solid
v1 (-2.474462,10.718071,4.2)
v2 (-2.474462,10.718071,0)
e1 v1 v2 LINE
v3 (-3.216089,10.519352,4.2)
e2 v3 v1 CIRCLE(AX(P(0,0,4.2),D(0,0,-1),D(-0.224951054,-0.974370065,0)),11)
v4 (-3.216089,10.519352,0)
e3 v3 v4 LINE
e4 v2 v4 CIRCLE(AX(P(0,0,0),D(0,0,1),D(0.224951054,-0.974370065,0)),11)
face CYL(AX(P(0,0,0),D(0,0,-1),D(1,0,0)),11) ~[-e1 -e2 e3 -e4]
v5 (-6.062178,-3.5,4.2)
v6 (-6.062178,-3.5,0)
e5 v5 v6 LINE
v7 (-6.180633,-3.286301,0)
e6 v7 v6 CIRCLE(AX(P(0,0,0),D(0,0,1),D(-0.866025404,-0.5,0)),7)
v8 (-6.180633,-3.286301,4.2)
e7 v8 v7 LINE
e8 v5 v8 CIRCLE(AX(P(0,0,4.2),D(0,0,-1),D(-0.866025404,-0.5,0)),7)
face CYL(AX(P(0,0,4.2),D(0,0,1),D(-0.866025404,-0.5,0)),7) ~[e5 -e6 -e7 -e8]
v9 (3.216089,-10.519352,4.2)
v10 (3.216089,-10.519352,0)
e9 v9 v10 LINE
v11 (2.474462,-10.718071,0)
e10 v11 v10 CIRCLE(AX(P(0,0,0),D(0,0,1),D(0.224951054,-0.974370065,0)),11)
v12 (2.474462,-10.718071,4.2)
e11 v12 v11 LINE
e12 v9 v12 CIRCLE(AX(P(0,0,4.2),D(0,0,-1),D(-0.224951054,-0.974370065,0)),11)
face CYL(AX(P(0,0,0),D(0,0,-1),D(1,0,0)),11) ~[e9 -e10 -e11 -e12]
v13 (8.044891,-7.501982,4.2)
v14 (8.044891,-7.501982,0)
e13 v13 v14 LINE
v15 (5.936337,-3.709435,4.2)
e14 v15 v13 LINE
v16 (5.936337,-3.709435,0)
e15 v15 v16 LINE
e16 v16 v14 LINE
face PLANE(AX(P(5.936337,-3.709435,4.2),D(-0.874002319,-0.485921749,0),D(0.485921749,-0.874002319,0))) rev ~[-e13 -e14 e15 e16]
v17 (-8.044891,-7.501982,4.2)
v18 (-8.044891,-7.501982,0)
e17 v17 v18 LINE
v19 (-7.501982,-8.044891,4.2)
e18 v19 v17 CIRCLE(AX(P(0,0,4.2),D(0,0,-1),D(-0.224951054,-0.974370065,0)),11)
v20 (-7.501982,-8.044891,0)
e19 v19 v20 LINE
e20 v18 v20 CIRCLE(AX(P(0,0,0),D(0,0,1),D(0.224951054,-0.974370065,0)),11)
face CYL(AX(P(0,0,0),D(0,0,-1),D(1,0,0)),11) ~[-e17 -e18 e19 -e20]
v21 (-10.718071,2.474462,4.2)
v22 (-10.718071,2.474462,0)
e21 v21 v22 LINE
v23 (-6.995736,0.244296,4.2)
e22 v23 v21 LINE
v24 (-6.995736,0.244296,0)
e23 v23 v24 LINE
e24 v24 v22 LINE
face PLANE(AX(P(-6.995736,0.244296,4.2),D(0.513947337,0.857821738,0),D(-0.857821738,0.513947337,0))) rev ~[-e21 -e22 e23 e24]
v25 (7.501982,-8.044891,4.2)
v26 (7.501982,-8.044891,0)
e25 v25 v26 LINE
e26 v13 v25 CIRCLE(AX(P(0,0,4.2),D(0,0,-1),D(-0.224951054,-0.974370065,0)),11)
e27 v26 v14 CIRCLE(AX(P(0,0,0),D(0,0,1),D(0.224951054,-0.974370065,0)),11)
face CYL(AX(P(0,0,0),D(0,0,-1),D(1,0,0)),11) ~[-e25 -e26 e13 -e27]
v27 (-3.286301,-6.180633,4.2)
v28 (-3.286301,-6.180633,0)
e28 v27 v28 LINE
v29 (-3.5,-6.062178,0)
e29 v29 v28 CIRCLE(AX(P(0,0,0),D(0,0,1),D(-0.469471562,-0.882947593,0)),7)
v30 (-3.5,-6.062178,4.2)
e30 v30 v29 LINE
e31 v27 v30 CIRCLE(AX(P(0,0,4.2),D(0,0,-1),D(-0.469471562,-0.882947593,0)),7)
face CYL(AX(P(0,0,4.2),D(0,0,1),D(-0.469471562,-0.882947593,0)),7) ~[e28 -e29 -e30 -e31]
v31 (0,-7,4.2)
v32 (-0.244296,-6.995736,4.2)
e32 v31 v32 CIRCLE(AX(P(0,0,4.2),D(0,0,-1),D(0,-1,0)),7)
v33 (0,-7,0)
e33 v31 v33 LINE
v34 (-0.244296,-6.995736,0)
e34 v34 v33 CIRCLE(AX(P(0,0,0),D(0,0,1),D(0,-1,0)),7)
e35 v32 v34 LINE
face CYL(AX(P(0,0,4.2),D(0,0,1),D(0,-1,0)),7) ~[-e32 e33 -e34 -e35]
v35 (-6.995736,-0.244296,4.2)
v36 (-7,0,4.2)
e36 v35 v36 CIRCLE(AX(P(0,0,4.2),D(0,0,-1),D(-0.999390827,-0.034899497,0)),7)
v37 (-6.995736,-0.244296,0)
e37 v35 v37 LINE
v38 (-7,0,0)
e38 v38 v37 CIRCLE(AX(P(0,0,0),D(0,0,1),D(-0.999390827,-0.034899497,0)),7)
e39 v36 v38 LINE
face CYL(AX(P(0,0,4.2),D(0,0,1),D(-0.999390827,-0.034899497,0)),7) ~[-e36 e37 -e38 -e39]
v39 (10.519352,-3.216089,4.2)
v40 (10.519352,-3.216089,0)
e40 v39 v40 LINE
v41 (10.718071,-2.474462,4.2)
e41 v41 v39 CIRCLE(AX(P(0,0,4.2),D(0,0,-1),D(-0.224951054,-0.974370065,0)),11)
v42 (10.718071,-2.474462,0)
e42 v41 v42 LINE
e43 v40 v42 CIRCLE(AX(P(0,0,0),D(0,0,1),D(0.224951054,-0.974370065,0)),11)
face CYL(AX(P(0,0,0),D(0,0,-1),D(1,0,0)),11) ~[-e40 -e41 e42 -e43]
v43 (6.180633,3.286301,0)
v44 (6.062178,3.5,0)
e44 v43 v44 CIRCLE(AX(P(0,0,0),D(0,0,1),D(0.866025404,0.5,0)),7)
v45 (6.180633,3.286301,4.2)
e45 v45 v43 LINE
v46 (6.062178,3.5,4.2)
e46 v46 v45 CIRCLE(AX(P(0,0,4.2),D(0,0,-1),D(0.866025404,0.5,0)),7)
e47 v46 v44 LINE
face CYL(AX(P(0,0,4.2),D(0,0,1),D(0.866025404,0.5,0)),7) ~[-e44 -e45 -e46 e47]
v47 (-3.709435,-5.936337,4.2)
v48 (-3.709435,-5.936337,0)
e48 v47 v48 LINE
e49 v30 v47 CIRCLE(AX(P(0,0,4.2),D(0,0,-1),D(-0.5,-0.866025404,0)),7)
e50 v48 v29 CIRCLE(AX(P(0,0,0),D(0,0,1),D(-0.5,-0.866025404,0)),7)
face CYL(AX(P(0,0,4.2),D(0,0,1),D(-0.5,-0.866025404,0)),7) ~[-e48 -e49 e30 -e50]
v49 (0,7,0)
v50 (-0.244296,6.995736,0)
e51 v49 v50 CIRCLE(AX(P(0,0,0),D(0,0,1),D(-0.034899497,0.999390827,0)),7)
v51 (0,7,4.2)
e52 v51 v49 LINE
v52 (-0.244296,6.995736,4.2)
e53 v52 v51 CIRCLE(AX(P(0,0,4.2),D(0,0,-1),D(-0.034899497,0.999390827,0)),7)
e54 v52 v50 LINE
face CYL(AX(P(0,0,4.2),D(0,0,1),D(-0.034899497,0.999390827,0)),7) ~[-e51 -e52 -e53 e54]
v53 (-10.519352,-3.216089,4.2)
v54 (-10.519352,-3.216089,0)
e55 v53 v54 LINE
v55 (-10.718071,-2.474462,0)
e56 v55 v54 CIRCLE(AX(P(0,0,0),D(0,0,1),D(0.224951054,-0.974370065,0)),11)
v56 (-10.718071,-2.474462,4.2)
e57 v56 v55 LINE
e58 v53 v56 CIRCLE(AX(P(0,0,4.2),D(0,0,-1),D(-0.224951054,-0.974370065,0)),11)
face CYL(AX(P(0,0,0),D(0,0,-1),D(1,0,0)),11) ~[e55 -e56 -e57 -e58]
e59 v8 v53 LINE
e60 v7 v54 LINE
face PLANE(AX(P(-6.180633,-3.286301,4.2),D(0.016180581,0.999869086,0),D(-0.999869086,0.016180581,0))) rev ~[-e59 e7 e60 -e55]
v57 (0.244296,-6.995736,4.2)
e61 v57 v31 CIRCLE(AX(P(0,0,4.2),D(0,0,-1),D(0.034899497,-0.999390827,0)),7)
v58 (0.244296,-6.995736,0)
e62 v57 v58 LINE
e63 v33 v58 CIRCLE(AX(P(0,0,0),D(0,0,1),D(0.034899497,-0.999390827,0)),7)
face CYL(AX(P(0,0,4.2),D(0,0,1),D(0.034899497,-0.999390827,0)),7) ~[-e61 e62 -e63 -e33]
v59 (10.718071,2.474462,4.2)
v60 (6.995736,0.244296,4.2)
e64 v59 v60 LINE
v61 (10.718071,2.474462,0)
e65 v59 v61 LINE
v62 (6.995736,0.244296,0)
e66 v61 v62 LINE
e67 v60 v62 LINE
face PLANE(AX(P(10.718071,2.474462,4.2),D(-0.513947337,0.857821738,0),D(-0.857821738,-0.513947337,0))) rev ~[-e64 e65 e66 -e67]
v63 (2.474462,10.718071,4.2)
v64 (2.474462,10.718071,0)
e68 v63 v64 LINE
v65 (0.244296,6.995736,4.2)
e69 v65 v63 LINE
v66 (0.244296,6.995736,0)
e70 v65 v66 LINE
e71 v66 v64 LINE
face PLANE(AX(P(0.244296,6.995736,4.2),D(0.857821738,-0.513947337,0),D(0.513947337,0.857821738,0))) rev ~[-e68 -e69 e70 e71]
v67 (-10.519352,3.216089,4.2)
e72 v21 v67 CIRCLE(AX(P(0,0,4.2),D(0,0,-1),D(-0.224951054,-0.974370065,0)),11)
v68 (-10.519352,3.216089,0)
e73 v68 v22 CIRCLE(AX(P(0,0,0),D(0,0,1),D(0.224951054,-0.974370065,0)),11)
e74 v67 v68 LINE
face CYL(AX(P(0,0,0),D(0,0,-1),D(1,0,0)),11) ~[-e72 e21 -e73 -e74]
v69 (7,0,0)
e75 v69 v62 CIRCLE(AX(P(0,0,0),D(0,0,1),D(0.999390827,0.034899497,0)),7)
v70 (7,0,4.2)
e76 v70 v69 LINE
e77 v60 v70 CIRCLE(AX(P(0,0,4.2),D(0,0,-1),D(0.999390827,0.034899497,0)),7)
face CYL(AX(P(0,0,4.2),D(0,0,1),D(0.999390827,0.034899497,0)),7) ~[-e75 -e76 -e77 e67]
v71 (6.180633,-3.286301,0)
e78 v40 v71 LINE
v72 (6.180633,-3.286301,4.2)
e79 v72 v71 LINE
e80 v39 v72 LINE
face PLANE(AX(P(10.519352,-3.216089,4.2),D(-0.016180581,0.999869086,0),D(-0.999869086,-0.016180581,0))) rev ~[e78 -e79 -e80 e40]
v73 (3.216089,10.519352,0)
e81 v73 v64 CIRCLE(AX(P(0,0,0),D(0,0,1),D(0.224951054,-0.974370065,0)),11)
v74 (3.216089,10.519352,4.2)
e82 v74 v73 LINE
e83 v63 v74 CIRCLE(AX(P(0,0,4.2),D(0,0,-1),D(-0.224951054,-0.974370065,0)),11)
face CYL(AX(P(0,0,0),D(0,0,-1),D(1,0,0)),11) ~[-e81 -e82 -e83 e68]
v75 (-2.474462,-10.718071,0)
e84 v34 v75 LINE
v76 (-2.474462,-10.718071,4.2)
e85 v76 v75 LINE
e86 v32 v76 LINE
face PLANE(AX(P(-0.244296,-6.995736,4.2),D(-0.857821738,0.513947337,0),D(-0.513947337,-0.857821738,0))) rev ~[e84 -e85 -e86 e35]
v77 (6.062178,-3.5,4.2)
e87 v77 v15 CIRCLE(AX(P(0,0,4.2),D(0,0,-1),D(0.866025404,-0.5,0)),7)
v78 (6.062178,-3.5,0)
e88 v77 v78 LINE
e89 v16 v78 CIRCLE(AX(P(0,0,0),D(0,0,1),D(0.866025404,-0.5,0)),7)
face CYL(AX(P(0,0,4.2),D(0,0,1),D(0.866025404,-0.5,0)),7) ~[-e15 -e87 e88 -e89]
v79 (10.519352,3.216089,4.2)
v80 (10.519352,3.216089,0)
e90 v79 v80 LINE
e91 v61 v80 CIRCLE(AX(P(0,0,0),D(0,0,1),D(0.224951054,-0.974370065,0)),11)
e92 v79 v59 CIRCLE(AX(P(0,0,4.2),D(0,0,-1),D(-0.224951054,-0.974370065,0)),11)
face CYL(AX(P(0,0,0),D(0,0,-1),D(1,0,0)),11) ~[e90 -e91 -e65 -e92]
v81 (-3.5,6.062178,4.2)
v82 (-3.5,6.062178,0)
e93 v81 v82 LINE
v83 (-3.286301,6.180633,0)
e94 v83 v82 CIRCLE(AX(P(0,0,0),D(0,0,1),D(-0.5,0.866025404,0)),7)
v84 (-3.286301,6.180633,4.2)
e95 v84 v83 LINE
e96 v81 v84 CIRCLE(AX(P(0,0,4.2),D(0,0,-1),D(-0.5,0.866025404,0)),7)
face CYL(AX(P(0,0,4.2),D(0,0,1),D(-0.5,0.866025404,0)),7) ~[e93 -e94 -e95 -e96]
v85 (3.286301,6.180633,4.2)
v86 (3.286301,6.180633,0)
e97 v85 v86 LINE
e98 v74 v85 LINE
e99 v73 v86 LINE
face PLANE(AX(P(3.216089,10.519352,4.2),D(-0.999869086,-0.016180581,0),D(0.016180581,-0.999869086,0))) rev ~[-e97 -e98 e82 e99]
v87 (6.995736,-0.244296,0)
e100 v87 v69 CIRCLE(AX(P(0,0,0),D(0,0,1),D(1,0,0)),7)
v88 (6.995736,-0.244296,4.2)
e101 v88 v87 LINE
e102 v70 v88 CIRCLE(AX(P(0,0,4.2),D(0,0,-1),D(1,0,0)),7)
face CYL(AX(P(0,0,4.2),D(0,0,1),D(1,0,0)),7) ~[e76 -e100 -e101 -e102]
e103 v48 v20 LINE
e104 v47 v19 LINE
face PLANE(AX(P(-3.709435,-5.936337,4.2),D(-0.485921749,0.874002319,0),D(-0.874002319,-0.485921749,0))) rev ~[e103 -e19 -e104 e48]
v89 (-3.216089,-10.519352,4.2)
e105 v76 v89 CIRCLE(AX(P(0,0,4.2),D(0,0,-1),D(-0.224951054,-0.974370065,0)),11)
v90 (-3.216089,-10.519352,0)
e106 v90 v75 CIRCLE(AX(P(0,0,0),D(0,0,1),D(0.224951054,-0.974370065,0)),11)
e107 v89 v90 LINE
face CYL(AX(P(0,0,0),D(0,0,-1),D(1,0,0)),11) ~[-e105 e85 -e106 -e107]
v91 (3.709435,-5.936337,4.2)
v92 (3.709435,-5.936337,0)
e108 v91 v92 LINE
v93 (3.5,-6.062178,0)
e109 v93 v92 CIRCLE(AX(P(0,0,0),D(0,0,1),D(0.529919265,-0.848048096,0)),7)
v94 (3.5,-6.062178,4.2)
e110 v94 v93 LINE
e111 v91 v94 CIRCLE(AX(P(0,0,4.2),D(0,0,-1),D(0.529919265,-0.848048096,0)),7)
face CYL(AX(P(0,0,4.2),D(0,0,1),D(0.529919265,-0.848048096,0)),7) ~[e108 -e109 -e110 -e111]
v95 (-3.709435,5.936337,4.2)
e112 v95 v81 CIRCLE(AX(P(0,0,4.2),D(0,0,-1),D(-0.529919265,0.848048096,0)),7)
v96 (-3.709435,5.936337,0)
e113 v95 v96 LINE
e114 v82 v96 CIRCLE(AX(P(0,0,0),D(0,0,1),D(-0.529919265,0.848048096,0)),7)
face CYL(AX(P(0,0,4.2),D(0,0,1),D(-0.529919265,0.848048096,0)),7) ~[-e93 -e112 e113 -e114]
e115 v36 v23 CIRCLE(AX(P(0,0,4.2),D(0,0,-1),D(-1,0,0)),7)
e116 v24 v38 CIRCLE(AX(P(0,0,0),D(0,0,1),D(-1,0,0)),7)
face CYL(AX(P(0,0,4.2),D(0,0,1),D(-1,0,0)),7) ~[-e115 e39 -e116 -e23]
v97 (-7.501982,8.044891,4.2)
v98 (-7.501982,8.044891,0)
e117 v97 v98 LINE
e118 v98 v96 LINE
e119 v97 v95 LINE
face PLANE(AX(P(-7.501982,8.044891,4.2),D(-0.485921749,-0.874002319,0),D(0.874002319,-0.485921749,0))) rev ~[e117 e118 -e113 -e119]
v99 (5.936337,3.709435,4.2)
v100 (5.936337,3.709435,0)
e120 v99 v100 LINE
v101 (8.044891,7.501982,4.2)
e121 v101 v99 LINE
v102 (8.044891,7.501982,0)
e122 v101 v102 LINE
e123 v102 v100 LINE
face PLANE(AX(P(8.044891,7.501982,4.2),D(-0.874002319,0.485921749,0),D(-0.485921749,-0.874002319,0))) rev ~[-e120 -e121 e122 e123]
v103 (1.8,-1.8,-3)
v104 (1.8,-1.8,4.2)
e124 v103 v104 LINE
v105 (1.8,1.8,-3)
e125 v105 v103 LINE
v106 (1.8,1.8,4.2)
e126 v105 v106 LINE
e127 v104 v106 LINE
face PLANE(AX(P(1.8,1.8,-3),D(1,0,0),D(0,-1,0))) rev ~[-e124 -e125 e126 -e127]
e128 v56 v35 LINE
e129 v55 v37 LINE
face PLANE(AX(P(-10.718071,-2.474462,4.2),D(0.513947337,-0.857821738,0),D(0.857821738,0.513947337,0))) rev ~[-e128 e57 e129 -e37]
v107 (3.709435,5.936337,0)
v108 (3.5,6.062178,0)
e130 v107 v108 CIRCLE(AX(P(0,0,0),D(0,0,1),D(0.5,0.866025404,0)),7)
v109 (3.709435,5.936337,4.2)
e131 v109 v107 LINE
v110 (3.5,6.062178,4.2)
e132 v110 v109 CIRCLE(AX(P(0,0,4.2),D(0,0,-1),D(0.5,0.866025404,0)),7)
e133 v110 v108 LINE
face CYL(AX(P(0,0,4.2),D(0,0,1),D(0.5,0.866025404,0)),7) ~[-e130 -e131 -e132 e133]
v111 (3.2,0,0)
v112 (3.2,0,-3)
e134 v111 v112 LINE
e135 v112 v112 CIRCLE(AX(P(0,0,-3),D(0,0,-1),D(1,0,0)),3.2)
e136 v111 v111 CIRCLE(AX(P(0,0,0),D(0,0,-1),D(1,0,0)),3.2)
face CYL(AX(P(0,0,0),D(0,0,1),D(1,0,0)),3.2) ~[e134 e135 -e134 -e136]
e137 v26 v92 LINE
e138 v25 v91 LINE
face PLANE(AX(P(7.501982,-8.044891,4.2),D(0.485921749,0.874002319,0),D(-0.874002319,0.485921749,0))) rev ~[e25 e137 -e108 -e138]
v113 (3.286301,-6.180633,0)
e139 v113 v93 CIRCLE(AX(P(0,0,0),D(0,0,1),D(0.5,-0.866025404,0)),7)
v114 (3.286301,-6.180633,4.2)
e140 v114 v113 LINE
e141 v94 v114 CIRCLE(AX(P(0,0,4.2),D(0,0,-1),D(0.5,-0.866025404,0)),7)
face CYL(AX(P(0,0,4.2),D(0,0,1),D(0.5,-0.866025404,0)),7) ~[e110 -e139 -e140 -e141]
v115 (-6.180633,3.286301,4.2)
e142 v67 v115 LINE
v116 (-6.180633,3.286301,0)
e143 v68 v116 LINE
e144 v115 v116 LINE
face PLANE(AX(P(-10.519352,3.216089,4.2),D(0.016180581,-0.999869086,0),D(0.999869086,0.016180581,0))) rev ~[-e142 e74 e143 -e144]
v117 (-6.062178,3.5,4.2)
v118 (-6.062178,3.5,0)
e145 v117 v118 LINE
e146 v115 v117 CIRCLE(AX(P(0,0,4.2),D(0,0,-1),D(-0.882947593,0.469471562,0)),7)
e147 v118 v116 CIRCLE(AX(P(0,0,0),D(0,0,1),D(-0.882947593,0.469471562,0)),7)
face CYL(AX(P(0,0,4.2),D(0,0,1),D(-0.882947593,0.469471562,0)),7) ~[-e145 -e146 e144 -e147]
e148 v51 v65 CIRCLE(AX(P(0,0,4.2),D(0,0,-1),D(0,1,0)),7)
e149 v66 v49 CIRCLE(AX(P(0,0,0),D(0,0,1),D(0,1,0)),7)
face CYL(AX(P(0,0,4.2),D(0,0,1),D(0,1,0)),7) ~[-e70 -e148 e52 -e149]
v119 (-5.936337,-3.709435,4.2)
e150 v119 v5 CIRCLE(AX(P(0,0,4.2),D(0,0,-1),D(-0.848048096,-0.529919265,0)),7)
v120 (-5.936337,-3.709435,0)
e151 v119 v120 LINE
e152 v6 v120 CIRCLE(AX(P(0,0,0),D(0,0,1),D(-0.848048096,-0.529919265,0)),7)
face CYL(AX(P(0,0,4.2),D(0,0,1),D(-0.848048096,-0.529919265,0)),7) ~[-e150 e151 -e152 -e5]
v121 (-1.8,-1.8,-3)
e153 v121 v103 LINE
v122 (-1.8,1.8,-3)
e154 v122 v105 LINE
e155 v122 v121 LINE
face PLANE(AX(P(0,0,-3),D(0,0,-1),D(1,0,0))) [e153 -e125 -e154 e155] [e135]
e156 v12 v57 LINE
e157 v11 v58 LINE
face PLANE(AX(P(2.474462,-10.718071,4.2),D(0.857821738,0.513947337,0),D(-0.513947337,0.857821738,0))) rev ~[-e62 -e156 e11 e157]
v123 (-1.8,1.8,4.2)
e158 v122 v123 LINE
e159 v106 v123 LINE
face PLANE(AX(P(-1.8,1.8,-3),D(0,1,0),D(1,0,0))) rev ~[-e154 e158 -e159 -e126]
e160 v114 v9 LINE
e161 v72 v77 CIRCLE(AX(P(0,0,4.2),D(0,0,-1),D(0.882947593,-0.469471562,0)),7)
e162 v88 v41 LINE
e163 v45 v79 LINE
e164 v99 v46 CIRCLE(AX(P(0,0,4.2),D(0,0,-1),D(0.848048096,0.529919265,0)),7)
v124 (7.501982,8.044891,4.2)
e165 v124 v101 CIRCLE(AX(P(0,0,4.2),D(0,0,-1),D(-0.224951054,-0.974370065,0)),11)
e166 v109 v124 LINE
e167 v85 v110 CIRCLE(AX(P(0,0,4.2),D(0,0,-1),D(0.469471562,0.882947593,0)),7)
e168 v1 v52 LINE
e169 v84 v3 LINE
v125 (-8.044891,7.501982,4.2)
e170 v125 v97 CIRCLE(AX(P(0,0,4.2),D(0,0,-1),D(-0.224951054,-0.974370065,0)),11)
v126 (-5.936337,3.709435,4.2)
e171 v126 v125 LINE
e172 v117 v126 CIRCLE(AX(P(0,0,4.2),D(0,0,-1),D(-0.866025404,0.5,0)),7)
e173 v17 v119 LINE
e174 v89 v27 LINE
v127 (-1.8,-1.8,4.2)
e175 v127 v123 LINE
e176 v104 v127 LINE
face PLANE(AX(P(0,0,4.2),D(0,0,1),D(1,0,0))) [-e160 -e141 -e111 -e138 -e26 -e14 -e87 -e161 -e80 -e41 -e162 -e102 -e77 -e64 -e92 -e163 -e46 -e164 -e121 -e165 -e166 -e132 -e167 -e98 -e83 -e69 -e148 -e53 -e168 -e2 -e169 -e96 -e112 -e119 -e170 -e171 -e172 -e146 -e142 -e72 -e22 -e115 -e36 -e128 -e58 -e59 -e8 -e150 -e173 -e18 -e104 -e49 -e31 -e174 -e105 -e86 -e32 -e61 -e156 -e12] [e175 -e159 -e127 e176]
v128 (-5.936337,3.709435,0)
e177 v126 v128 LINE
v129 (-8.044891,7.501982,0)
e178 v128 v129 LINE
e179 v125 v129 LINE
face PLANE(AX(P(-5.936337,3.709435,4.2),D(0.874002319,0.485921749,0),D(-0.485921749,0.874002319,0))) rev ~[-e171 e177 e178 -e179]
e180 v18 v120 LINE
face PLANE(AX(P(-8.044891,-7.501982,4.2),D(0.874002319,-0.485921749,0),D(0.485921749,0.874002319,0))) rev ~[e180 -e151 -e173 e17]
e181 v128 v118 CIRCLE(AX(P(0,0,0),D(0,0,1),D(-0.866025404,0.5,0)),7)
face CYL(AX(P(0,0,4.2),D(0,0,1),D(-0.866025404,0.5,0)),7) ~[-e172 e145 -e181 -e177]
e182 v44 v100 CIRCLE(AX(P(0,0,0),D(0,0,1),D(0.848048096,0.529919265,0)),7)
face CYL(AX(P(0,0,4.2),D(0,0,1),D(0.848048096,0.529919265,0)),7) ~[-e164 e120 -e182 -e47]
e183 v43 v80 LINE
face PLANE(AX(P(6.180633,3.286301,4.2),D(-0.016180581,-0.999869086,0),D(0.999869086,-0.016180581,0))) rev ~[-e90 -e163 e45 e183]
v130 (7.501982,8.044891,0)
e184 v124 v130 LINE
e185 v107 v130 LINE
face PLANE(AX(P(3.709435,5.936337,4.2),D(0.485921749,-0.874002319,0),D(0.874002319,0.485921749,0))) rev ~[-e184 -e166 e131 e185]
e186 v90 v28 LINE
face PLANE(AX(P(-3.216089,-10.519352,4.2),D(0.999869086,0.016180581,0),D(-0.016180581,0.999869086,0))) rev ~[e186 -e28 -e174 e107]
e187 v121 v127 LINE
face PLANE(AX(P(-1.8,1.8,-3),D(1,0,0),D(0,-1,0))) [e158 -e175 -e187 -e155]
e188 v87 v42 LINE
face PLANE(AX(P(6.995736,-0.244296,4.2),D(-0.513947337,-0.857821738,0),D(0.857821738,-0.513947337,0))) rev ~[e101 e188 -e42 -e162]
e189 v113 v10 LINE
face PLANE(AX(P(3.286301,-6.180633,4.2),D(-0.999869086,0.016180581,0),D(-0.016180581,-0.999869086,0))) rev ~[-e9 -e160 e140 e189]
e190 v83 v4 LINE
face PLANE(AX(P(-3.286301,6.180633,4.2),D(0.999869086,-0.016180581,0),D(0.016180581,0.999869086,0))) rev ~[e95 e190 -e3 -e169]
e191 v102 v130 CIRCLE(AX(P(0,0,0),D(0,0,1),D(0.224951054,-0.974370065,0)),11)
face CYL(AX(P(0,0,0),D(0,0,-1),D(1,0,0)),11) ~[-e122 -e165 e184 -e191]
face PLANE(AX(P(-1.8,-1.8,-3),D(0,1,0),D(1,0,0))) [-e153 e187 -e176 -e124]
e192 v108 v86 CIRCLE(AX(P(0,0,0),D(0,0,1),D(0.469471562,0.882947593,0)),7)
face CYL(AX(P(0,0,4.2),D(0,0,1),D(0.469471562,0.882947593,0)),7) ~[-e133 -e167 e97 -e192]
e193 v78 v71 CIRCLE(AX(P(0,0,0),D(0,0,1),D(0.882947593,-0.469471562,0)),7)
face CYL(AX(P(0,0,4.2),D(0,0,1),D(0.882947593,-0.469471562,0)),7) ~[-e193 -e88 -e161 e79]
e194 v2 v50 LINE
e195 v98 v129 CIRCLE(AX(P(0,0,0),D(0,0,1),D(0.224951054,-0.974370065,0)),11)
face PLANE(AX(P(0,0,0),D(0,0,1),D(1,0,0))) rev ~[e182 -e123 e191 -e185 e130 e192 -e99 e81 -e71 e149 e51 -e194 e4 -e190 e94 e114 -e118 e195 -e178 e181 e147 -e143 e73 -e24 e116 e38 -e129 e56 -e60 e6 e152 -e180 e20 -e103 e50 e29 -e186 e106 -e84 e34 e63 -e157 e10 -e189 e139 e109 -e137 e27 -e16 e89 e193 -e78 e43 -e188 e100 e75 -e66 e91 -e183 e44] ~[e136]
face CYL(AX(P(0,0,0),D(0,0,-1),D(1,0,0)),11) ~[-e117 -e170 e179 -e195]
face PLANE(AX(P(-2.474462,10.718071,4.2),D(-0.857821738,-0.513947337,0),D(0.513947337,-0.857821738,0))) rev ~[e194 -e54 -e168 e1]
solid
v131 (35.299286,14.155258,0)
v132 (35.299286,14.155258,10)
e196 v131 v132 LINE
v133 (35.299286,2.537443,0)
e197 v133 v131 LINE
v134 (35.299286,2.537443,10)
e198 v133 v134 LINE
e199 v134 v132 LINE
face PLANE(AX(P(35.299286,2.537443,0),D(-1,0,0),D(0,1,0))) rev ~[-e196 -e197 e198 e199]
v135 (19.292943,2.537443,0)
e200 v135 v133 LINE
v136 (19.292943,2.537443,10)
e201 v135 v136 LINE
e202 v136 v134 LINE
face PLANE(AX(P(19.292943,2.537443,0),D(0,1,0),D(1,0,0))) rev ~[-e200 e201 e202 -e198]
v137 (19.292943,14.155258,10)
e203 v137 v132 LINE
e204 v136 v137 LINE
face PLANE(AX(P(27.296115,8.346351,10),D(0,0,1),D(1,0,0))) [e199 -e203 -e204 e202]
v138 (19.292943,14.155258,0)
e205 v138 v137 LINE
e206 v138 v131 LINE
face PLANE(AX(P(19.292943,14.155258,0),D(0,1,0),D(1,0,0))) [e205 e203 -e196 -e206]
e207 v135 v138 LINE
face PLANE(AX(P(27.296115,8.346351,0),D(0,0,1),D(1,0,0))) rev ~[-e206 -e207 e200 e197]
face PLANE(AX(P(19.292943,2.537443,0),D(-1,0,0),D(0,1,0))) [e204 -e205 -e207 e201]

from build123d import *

# Parameters (mm, degrees)
F0_R            = 11
F1_DEPTH        = 4.2
F3_DEPTH        = 4.201
F3_COPIES_COUNT = 12
F5_R            = 3.2
F6_DEPTH        = 3
F7_W            = 3.6
F7_H            = 3.6
F8_DEPTH        = 7.201
F9_W            = 16.0063430667
F9_H            = 11.617815122
F10_DEPTH       = 10


# Not quite as in the source:
# - a pattern or mirror of a feature is missing from the dataset's text; its kind, count and spacing are read off the source's solid


with BuildPart() as f1:
    # F0 (on Top) → F1 (new body)
    with BuildSketch(Plane.XY):
        Circle(F0_R)
    extrude(amount=F1_DEPTH)

    # F2 (on face) → F3 (cut, through all)
    with BuildSketch(Plane.XY.offset(4.2)):
        with BuildLine():
            ThreePointArc((0.2442964769, -6.9957357891), (0.1221668451, -6.9989338661), (0, -7))
            Line((0, -7), (0, -11))
            ThreePointArc((0, -11), (1.2452353514, -10.9292904124), (2.4744615978, -10.7180707126))
            Line((2.4744615978, -10.7180707126), (0.2442964769, -6.9957357891))
        make_face()
        with BuildLine():
            Line((0, -11), (0, -7))
            ThreePointArc((0, -7), (-0.1221668451, -6.9989338661), (-0.2442964769, -6.9957357891))
            Line((-0.2442964769, -6.9957357891), (-2.4744615978, -10.7180707126))
            ThreePointArc((-2.4744615978, -10.7180707126), (-1.2452353514, -10.9292904124), (0, -11))
        make_face()
    f3 = extrude(amount=-F3_DEPTH, mode=Mode.SUBTRACT)

    # F3_copies: F3 ×12 about axis
    f3_copies_axis = Axis((0, 0, 0), (0, 0, 1))
    for i in range(1, F3_COPIES_COUNT):
        add(f3.rotate(f3_copies_axis, i * 360 / F3_COPIES_COUNT), mode=Mode.SUBTRACT)

    # F5 (on face) → F6 (join)
    with BuildSketch(Plane(origin=(0, 0, 0), x_dir=(1, 0, 0), z_dir=(0, 0, -1))):
        Circle(F5_R)
    extrude(amount=F6_DEPTH)

    # F7 (on face) → F8 (cut, through all)
    with BuildSketch(Plane(origin=(0, 0, -3), x_dir=(1, 0, 0), z_dir=(0, 0, -1))):
        Rectangle(F7_W, F7_H)
    extrude(amount=-F8_DEPTH, mode=Mode.SUBTRACT)


with BuildPart() as f10:
    # F9 (on Top) → F10 (new body)
    with BuildSketch(Plane.XY):
        with Locations((27.296114713, 8.3463508636)):
            Rectangle(F9_W, F9_H)
    extrude(amount=F10_DEPTH)


solid = Compound([f1.part, f10.part])
